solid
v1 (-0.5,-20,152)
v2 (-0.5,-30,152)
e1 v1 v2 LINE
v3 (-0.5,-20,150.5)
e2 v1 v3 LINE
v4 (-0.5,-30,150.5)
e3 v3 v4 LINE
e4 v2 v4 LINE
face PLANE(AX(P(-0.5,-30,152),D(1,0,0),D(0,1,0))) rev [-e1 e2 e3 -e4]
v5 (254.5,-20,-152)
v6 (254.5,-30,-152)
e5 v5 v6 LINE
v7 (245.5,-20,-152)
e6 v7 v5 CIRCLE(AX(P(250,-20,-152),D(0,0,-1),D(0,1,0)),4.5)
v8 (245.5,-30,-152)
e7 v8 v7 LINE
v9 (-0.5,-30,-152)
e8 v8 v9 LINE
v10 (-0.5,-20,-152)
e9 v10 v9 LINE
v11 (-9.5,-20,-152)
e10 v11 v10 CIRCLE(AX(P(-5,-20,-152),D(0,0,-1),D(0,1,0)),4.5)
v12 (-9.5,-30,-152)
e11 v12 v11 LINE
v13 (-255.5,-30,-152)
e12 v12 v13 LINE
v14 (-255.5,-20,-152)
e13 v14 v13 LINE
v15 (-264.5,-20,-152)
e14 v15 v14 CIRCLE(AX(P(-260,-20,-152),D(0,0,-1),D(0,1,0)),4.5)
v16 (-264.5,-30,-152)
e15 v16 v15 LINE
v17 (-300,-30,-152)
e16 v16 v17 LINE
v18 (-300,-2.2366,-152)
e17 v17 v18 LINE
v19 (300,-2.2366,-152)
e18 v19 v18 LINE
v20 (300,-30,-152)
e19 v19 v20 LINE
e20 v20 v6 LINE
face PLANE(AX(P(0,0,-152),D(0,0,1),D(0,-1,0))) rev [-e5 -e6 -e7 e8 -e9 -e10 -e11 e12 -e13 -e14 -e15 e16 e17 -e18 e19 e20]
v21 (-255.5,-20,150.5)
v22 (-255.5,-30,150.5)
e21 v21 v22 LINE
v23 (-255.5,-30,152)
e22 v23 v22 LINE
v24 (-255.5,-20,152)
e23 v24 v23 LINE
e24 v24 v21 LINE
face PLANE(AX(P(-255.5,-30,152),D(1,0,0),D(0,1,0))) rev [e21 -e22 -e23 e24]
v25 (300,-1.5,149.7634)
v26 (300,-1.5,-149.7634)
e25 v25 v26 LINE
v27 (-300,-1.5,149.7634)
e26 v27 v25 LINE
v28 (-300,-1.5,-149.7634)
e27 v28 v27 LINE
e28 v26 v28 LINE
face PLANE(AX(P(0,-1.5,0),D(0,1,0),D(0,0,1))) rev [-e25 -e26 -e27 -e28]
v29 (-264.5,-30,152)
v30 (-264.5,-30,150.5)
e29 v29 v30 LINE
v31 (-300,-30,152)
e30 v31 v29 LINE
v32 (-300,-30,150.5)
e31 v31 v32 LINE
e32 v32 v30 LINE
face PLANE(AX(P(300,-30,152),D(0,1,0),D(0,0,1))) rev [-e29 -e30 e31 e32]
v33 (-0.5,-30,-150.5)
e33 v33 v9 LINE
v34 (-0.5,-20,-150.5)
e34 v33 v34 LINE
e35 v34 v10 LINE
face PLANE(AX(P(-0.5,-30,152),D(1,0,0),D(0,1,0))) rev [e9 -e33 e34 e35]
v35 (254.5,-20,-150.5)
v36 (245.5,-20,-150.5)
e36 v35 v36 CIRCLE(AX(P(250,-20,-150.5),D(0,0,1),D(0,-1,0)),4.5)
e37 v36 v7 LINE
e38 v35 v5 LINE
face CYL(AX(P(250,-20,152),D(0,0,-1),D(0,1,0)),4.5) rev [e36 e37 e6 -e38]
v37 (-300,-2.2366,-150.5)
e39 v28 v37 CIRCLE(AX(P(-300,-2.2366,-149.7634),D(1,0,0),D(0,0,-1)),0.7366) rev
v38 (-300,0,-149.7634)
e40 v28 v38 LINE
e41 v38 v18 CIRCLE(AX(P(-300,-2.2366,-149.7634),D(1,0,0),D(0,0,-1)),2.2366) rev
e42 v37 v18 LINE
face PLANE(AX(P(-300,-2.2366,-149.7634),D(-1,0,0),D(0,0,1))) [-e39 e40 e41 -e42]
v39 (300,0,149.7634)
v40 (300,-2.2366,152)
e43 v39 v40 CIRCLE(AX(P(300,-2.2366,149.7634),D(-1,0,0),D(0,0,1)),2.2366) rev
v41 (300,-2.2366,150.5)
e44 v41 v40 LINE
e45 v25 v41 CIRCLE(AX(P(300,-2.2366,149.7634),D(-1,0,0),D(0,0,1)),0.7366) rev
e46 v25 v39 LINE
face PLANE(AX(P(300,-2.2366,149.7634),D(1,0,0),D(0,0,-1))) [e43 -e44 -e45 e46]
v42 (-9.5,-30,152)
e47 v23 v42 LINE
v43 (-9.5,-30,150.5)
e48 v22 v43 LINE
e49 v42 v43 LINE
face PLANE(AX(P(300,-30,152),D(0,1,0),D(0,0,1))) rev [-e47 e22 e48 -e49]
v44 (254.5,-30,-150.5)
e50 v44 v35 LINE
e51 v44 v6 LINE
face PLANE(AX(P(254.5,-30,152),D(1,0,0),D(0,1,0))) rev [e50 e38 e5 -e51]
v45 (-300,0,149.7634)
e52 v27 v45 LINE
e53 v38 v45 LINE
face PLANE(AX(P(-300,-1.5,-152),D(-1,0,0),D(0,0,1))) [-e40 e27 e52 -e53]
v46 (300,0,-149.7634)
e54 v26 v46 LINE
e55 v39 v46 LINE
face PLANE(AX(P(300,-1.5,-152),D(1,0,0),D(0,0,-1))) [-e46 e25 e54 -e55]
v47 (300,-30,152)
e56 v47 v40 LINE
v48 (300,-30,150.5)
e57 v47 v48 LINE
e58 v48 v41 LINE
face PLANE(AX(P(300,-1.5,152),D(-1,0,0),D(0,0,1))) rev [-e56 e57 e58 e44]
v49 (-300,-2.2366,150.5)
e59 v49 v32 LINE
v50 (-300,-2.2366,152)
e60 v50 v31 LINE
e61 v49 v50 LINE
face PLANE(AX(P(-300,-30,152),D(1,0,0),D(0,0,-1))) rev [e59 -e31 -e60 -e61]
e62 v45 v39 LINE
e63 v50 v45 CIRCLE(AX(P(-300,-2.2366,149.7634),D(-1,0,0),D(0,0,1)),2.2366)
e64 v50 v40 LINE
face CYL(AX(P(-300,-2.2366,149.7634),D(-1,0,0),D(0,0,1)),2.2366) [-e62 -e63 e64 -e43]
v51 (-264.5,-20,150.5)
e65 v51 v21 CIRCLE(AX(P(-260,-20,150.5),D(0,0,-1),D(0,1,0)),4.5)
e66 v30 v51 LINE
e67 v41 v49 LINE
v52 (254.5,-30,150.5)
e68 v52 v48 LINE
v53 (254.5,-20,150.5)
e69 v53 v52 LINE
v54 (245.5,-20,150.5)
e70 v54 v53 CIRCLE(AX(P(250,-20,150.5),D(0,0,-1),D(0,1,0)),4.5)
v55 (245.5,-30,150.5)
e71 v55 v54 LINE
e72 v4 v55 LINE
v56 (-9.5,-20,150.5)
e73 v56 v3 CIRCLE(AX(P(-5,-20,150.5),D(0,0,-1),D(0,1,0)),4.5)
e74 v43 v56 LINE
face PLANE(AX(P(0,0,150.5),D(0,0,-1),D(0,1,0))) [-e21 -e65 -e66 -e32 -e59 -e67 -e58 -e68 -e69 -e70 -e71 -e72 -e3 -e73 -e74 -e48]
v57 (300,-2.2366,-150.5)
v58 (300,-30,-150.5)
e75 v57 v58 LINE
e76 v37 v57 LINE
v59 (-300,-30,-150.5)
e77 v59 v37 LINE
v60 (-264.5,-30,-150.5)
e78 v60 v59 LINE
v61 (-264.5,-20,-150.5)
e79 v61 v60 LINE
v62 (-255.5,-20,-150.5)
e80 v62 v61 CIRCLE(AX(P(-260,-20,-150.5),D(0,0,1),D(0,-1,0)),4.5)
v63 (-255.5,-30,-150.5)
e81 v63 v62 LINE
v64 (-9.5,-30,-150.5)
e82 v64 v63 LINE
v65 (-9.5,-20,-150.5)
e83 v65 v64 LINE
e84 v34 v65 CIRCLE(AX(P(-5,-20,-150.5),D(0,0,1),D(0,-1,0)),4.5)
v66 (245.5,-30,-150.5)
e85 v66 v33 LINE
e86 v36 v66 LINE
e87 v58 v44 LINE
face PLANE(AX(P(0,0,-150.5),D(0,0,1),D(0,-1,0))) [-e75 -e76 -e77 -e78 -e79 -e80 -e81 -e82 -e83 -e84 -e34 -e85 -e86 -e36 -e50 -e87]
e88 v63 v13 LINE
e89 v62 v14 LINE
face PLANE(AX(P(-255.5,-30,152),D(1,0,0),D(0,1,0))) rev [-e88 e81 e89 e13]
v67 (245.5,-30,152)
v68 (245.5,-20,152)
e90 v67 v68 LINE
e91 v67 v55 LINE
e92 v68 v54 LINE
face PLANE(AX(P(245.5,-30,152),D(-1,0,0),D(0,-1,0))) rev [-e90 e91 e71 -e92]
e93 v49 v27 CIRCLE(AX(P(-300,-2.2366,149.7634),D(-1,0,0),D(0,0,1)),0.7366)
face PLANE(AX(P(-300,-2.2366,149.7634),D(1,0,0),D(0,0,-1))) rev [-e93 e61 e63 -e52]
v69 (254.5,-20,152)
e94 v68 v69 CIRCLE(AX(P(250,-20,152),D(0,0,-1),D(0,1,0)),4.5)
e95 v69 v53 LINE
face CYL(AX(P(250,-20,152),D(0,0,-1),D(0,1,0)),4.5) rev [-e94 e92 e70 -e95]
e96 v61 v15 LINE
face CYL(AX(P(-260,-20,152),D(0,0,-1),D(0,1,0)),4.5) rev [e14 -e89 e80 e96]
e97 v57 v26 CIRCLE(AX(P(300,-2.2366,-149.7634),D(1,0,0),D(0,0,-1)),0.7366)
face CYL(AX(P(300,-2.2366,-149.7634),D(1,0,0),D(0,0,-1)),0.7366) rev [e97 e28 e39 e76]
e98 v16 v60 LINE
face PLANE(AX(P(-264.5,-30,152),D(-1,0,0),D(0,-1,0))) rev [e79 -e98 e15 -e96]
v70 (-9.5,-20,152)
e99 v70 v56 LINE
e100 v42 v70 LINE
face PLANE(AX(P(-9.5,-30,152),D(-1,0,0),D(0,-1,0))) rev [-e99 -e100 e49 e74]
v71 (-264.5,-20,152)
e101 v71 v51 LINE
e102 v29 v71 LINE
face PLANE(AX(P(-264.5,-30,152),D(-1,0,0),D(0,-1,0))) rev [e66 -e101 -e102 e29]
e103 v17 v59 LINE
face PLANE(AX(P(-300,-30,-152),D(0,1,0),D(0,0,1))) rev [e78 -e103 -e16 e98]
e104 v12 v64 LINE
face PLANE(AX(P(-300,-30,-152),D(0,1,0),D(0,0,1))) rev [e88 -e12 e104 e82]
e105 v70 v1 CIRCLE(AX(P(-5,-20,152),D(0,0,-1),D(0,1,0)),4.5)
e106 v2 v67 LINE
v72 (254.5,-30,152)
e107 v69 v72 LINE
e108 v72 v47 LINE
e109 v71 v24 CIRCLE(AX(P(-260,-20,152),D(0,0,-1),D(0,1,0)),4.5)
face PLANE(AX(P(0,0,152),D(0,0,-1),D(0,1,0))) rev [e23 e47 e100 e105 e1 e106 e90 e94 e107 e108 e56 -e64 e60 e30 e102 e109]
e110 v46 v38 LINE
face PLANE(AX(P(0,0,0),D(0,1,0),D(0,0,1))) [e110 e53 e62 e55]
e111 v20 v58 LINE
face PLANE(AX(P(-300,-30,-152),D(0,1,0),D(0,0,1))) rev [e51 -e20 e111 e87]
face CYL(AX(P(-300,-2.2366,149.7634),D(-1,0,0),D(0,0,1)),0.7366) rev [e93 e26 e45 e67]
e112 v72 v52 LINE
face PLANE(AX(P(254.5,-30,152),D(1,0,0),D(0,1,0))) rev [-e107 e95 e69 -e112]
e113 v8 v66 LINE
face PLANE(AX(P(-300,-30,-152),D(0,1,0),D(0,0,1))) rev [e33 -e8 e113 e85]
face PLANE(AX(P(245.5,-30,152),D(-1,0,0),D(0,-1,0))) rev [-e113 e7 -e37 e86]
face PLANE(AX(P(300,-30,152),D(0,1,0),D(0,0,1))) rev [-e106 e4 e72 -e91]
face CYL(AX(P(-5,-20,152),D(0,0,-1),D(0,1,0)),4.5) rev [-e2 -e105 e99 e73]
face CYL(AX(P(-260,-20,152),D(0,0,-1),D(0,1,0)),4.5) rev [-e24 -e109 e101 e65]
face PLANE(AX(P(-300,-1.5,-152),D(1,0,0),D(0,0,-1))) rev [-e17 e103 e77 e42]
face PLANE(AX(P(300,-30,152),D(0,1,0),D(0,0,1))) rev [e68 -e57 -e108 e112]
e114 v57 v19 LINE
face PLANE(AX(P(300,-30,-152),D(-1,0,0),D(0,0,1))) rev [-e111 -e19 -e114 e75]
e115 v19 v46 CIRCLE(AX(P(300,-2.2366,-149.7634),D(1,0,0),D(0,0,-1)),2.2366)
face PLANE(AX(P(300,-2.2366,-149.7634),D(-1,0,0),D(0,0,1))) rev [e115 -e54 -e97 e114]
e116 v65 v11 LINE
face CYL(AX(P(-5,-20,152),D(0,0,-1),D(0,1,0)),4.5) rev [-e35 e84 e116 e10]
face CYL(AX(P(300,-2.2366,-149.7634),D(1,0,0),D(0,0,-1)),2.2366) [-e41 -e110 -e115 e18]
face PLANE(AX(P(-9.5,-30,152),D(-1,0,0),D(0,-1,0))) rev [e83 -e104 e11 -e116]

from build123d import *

# Parameters (mm, degrees)
SKETCH_1_W                         = 600
SKETCH_1_H                         = 304
SM_BASE_FLANGE_1_DEPTH             = 1.5
SM_EDGE_FLANGE_1_STRIP_W           = 7.4732
SM_EDGE_FLANGE_1_STRIP_H           = 1.5
SM_EDGE_FLANGE_1_STRIP_CUT_DEPTH   = 600
SM_EDGE_FLANGE_1_STRIP_2_W         = 7.4732
SM_EDGE_FLANGE_1_STRIP_2_H         = 1.5
SM_EDGE_FLANGE_1_STRIP_CUT_2_DEPTH = 600
SM_EDGE_FLANGE_1_DEPTH             = 600
SM_EDGE_FLANGE_1_BEND_DEPTH        = 600
CUT_EXTRUDE_1_DEPTH                = 429.154177838
PATTERN_LINEAR_1_COUNT             = 3
PATTERN_LINEAR_1_PITCH             = 255


# Sheet-metal steps are written as plain solids
with BuildPart() as part:
    # Sketch 1 → 基体-法兰1 (new body)
    with BuildSketch(Plane(origin=(0, 0, 0), x_dir=(1, 0, 0), z_dir=(0, 1, 0))):
        Rectangle(SKETCH_1_W, SKETCH_1_H)
    extrude(amount=-SM_BASE_FLANGE_1_DEPTH)

    # 边线-法兰1 strip (across the edge) → 边线-法兰1 strip cut (cut)
    with BuildSketch(Plane(origin=(300, -1.5, 152), x_dir=(0, 0, -1), z_dir=(-1, 0, 0))):
        with Locations((-1.5, -0.75)):
            Rectangle(SM_EDGE_FLANGE_1_STRIP_W, SM_EDGE_FLANGE_1_STRIP_H)
    extrude(amount=SM_EDGE_FLANGE_1_STRIP_CUT_DEPTH, mode=Mode.SUBTRACT)

    # 边线-法兰1 strip 2 (across the edge) → 边线-法兰1 strip cut 2 (cut)
    with BuildSketch(Plane(origin=(-300, -1.5, -152), x_dir=(0, 0, 1), z_dir=(1, 0, 0))):
        with Locations((-1.5, -0.75)):
            Rectangle(SM_EDGE_FLANGE_1_STRIP_2_W, SM_EDGE_FLANGE_1_STRIP_2_H)
    extrude(amount=SM_EDGE_FLANGE_1_STRIP_CUT_2_DEPTH, mode=Mode.SUBTRACT)

    # 边线-法兰1 section (across the edge) → 边线-法兰1 (add)
    with BuildSketch(Plane(origin=(300, -1.5, 152), x_dir=(0, 0, -1), z_dir=(-1, 0, 0))):
        with BuildLine():
            Line((0, 0.7366), (0, 28.5))
            Line((0, 28.5), (1.5, 28.5))
            Line((1.5, 28.5), (1.5, 0.7366))
            ThreePointArc((1.5, 0.7366), (1.715745145, 0.215745145), (2.2366, 0))
            Line((2.2366, 0), (2.2366, -1.5))
            ThreePointArc((2.2366, -1.5), (0.655084973, -0.844915027), (0, 0.7366))
        make_face()
    extrude(amount=SM_EDGE_FLANGE_1_DEPTH)

    # 边线-法兰1 section 2 (across the edge) → 边线-法兰1 bend (add)
    with BuildSketch(Plane(origin=(-300, -1.5, -152), x_dir=(0, 0, 1), z_dir=(1, 0, 0))):
        with BuildLine():
            Line((0, 0.7366), (0, 28.5))
            Line((0, 28.5), (1.5, 28.5))
            Line((1.5, 28.5), (1.5, 0.7366))
            ThreePointArc((1.5, 0.7366), (1.715745145, 0.215745145), (2.2366, 0))
            Line((2.2366, 0), (2.2366, -1.5))
            ThreePointArc((2.2366, -1.5), (0.655084973, -0.844915027), (0, 0.7366))
        make_face()
    extrude(amount=SM_EDGE_FLANGE_1_BEND_DEPTH)

    # 草图12 → 切除-拉伸1 (cut, through all)
    with BuildSketch(Plane(origin=(0, 0, -152), x_dir=(-1, 0, 0), z_dir=(0, 0, -1))):
        with BuildLine():
            Line((-254.5, -30), (-254.5, -20))
            ThreePointArc((-254.5, -20), (-250, -15.5), (-245.5, -20))
            Line((-245.5, -20), (-245.5, -30))
            ThreePointArc((-245.5, -30), (-250, -34.5), (-254.5, -30))
        make_face()
    cut_extrude_1 = extrude(amount=-CUT_EXTRUDE_1_DEPTH, mode=Mode.SUBTRACT)

    # 阵列(线性)1: 切除-拉伸1 ×3
    with Locations(*[(-i * PATTERN_LINEAR_1_PITCH, 0, 0) for i in range(1, PATTERN_LINEAR_1_COUNT)]):
        add(cut_extrude_1, mode=Mode.SUBTRACT)


solid = part.part
